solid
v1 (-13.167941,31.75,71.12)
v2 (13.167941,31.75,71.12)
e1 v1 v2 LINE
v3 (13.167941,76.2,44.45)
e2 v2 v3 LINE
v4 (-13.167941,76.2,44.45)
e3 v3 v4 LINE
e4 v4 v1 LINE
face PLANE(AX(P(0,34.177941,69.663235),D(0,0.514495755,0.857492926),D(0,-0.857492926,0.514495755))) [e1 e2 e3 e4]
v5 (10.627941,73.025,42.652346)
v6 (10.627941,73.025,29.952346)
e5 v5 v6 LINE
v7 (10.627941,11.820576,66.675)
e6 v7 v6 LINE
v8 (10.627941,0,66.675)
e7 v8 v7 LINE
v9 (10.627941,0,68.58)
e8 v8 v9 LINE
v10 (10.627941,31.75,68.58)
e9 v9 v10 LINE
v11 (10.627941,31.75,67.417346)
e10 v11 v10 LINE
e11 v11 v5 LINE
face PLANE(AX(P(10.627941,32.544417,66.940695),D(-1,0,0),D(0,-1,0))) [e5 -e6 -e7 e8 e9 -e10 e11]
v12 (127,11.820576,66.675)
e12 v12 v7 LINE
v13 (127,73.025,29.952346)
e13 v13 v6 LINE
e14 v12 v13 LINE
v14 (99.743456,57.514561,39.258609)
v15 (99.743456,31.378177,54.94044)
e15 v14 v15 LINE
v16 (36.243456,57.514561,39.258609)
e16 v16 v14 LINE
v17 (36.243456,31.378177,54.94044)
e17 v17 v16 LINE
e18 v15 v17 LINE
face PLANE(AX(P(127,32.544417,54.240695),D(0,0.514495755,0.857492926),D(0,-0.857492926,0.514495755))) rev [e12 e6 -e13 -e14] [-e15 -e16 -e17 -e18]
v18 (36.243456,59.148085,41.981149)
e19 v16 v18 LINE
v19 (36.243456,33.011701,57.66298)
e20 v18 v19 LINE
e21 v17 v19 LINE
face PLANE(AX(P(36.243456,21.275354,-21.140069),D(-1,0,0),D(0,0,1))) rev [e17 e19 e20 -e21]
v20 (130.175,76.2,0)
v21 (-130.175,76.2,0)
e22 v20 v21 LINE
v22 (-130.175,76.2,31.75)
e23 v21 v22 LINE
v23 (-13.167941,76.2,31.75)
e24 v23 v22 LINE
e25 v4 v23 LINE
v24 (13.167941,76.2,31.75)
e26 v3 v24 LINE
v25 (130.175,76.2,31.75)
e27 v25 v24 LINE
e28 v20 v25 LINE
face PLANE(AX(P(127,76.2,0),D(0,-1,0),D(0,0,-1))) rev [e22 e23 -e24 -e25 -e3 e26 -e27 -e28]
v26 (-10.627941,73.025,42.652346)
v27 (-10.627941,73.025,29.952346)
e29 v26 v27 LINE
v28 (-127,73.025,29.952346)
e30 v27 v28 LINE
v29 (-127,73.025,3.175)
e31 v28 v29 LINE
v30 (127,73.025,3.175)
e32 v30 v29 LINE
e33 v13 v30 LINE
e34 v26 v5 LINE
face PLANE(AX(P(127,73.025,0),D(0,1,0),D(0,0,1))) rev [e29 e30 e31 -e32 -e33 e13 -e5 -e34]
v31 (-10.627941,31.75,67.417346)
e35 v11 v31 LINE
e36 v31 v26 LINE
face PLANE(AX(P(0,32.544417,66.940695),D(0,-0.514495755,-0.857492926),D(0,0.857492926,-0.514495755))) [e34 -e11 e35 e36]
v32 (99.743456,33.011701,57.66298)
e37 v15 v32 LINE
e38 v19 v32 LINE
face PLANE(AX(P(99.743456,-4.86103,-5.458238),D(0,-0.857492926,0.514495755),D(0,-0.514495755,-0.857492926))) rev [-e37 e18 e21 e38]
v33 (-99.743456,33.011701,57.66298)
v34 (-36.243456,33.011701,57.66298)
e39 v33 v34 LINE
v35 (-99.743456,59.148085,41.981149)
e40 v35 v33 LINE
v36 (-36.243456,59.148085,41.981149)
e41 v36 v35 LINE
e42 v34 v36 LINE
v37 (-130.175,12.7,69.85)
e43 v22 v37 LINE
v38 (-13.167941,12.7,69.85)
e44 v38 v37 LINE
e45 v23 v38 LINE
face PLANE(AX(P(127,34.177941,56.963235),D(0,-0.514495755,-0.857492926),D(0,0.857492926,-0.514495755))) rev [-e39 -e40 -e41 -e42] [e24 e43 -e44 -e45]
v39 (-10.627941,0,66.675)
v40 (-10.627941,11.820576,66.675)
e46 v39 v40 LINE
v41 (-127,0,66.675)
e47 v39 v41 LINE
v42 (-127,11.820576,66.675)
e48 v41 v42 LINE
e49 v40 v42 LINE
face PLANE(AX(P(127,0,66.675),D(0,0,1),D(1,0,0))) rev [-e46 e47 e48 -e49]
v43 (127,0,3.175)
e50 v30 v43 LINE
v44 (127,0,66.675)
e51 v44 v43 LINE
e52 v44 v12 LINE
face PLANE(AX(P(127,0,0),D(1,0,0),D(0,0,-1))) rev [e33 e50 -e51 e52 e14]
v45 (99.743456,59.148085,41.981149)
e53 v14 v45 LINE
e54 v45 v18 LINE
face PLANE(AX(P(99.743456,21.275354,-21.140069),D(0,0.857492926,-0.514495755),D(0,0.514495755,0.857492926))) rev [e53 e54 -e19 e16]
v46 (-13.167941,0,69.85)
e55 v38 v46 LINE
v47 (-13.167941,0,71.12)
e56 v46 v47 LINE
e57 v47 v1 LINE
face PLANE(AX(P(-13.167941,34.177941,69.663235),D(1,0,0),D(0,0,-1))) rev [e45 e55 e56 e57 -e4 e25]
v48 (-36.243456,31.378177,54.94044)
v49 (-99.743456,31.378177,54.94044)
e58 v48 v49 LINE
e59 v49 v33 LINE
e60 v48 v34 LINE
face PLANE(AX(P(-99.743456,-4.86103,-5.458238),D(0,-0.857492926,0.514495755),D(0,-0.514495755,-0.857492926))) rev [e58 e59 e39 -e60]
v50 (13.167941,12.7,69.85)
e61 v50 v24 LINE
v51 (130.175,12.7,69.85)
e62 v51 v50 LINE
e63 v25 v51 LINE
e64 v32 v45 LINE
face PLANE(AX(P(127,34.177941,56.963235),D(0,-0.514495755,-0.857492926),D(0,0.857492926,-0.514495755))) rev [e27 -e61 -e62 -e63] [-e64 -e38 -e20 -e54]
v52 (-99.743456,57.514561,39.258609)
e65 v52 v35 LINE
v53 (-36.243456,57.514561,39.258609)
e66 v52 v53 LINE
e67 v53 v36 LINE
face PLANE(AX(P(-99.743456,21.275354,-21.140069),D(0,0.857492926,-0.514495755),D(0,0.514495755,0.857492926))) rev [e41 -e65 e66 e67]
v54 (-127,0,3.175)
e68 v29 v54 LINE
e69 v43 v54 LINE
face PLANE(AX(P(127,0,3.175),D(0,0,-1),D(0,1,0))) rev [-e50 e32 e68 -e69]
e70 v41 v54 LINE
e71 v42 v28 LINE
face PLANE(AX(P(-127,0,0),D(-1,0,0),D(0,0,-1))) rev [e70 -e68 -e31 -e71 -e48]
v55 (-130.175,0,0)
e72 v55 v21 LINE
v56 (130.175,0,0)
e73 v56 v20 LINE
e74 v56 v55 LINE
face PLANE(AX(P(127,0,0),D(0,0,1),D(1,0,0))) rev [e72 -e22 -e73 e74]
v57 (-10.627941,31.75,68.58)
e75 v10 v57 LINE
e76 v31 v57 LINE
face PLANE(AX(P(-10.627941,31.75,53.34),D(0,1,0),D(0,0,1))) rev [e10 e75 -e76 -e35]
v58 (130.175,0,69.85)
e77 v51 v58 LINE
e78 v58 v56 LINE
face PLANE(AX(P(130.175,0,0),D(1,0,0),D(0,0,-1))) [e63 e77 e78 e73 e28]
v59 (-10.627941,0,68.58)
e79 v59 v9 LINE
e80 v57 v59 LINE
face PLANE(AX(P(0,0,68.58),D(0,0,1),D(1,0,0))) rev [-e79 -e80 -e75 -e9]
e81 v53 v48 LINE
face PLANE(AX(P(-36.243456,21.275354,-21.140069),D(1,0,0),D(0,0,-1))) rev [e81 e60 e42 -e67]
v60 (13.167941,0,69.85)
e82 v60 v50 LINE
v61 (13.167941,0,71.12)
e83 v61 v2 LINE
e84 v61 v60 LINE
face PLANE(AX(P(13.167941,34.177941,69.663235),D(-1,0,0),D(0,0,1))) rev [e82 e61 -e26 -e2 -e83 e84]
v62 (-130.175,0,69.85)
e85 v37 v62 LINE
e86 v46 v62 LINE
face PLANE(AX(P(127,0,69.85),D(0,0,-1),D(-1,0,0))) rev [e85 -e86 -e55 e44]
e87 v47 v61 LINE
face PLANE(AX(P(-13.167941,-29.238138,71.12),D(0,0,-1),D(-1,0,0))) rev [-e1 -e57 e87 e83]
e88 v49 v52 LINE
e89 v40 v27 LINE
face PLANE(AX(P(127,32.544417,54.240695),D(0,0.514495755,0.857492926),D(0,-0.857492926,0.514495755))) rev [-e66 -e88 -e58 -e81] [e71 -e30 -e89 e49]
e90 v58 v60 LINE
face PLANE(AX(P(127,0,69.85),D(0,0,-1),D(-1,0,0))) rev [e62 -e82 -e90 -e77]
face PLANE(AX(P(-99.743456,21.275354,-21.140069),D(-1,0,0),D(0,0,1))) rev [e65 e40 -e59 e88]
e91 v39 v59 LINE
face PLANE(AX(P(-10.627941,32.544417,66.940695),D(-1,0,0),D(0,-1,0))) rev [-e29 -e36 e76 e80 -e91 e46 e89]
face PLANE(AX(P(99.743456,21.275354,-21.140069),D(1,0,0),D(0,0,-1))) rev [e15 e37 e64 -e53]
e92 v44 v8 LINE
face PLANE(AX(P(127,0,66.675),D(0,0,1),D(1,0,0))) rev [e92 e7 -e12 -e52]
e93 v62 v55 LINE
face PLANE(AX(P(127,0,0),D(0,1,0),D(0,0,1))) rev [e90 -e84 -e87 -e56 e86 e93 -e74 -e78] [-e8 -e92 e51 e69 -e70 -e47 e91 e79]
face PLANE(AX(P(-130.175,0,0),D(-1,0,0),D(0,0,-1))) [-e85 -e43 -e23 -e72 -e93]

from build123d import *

# Parameters (mm, degrees)
BOSS_EXTRUDE1_DEPTH = 127
BOSS_EXTRUDE2_DEPTH = 3.175
SKETCH3_W           = 63.5
SKETCH3_H           = 30.48
CUT_EXTRUDE1_DEPTH  = 3.175
BOSS_EXTRUDE3_START = -13.167941481
BOSS_EXTRUDE3_DEPTH = 26.335882962
SKETCH10_W          = 26.335882962
SKETCH10_H          = 12.7
BOSS_EXTRUDE5_DEPTH = 31.75
CUT_EXTRUDE7_START  = -10.627941481
CUT_EXTRUDE7_DEPTH  = 21.255882962
CUT_EXTRUDE8_START  = -2.54
SKETCH12_W          = 21.255882962
SKETCH12_H          = 31.75
CUT_EXTRUDE8_DEPTH  = 15.24
CUT_EXTRUDE9_START  = -26.335883
CUT_EXTRUDE9_DEPTH  = 26.335883


# Read off the part's stored shape, not the designer's step: Boss-Extrude3, Cut-Extrude7
with BuildPart() as part:
    # Sketch1 → Boss-Extrude1 (new, symmetric)
    with BuildSketch(Plane(origin=(0, 0, 0), x_dir=(0, 0, -1), z_dir=(1, 0, 0))):
        Polygon((-3.175, 0), (0, 0), (0, 76.2), (-31.75, 76.2), (-69.85, 12.7), (-69.85, 0), (-66.675, 0), (-66.675, 11.820575911), (-29.952345547, 73.025), (-3.175, 73.025), align=None)
    extrude(amount=BOSS_EXTRUDE1_DEPTH, both=True)

    # Sketch2 → Boss-Extrude2 (add)
    with BuildSketch(Plane(origin=(127, 0, 0), x_dir=(0, 0, -1), z_dir=(1, 0, 0))):
        Polygon((-66.675, 0), (-3.175, 0), (-3.175, 73.025), (-29.952345547, 73.025), (-66.675, 11.820575911), align=None)
        Polygon((-66.675, 11.820575911), (-29.952345547, 73.025), (-3.175, 73.025), (-3.175, 0), (0, 0), (0, 76.2), (-31.75, 76.2), (-69.85, 12.7), (-69.85, 0), (-66.675, 0), align=None)
    boss_extrude2 = extrude(amount=BOSS_EXTRUDE2_DEPTH)

    # Mirror1: Boss-Extrude2 across plane
    add(boss_extrude2.mirror(Plane(origin=(0, 0, 0), x_dir=(0, 0, 1), z_dir=(1, 0, 0))))

    # Sketch3 → Cut-Extrude1 (cut)
    with BuildSketch(Plane(origin=(0, 34.177941176, 56.963235294), x_dir=(1, 0, 0), z_dir=(0, 0.5144957554275267, 0.8574929257125442))):
        with Locations((-67.993455951, 13.879941606)):
            Rectangle(SKETCH3_W, SKETCH3_H)
        with Locations((67.993455951, 13.879941606)):
            Rectangle(SKETCH3_W, SKETCH3_H)
    extrude(amount=-CUT_EXTRUDE1_DEPTH, mode=Mode.SUBTRACT)

    # Boss-Extrude3 outline → Boss-Extrude3 (add)
    with BuildSketch(Plane.YZ.offset(BOSS_EXTRUDE3_START)):
        Polygon((76.2, 31.75), (76.2, 44.45), (31.75, 71.12), (31.75, 58.42), align=None)
    extrude(amount=BOSS_EXTRUDE3_DEPTH)

    # Sketch10 → Boss-Extrude5 (add)
    with BuildSketch(Plane.XZ.offset(-31.75)):
        with Locations((0, 64.77)):
            Rectangle(SKETCH10_W, SKETCH10_H)
    extrude(amount=BOSS_EXTRUDE5_DEPTH)

    # Cut-Extrude7 outline → Cut-Extrude7 (cut)
    with BuildSketch(Plane.YZ.offset(CUT_EXTRUDE7_START)):
        Polygon((31.75, 54.717345547), (73.025, 29.952345547), (73.025, 42.652345547), (31.75, 67.417345547), align=None)
    extrude(amount=CUT_EXTRUDE7_DEPTH, mode=Mode.SUBTRACT)

    # Sketch12 → Cut-Extrude8 (cut)
    with BuildSketch(Plane.XY.offset(71.12).offset(CUT_EXTRUDE8_START)):
        with Locations((0, 15.875)):
            Rectangle(SKETCH12_W, SKETCH12_H)
    extrude(amount=-CUT_EXTRUDE8_DEPTH, mode=Mode.SUBTRACT)

    # Sketch13 → Cut-Extrude9 (cut)
    with BuildSketch(Plane(origin=(13.167941481, 0, 0), x_dir=(0, 0, -1), z_dir=(1, 0, 0)).offset(CUT_EXTRUDE9_START)):
        Polygon((-58.42, 25.578909245), (-66.675, 11.820575911), (-66.675, 0), (-58.42, 0), align=None)
    extrude(amount=CUT_EXTRUDE9_DEPTH, mode=Mode.SUBTRACT)


solid = part.part
